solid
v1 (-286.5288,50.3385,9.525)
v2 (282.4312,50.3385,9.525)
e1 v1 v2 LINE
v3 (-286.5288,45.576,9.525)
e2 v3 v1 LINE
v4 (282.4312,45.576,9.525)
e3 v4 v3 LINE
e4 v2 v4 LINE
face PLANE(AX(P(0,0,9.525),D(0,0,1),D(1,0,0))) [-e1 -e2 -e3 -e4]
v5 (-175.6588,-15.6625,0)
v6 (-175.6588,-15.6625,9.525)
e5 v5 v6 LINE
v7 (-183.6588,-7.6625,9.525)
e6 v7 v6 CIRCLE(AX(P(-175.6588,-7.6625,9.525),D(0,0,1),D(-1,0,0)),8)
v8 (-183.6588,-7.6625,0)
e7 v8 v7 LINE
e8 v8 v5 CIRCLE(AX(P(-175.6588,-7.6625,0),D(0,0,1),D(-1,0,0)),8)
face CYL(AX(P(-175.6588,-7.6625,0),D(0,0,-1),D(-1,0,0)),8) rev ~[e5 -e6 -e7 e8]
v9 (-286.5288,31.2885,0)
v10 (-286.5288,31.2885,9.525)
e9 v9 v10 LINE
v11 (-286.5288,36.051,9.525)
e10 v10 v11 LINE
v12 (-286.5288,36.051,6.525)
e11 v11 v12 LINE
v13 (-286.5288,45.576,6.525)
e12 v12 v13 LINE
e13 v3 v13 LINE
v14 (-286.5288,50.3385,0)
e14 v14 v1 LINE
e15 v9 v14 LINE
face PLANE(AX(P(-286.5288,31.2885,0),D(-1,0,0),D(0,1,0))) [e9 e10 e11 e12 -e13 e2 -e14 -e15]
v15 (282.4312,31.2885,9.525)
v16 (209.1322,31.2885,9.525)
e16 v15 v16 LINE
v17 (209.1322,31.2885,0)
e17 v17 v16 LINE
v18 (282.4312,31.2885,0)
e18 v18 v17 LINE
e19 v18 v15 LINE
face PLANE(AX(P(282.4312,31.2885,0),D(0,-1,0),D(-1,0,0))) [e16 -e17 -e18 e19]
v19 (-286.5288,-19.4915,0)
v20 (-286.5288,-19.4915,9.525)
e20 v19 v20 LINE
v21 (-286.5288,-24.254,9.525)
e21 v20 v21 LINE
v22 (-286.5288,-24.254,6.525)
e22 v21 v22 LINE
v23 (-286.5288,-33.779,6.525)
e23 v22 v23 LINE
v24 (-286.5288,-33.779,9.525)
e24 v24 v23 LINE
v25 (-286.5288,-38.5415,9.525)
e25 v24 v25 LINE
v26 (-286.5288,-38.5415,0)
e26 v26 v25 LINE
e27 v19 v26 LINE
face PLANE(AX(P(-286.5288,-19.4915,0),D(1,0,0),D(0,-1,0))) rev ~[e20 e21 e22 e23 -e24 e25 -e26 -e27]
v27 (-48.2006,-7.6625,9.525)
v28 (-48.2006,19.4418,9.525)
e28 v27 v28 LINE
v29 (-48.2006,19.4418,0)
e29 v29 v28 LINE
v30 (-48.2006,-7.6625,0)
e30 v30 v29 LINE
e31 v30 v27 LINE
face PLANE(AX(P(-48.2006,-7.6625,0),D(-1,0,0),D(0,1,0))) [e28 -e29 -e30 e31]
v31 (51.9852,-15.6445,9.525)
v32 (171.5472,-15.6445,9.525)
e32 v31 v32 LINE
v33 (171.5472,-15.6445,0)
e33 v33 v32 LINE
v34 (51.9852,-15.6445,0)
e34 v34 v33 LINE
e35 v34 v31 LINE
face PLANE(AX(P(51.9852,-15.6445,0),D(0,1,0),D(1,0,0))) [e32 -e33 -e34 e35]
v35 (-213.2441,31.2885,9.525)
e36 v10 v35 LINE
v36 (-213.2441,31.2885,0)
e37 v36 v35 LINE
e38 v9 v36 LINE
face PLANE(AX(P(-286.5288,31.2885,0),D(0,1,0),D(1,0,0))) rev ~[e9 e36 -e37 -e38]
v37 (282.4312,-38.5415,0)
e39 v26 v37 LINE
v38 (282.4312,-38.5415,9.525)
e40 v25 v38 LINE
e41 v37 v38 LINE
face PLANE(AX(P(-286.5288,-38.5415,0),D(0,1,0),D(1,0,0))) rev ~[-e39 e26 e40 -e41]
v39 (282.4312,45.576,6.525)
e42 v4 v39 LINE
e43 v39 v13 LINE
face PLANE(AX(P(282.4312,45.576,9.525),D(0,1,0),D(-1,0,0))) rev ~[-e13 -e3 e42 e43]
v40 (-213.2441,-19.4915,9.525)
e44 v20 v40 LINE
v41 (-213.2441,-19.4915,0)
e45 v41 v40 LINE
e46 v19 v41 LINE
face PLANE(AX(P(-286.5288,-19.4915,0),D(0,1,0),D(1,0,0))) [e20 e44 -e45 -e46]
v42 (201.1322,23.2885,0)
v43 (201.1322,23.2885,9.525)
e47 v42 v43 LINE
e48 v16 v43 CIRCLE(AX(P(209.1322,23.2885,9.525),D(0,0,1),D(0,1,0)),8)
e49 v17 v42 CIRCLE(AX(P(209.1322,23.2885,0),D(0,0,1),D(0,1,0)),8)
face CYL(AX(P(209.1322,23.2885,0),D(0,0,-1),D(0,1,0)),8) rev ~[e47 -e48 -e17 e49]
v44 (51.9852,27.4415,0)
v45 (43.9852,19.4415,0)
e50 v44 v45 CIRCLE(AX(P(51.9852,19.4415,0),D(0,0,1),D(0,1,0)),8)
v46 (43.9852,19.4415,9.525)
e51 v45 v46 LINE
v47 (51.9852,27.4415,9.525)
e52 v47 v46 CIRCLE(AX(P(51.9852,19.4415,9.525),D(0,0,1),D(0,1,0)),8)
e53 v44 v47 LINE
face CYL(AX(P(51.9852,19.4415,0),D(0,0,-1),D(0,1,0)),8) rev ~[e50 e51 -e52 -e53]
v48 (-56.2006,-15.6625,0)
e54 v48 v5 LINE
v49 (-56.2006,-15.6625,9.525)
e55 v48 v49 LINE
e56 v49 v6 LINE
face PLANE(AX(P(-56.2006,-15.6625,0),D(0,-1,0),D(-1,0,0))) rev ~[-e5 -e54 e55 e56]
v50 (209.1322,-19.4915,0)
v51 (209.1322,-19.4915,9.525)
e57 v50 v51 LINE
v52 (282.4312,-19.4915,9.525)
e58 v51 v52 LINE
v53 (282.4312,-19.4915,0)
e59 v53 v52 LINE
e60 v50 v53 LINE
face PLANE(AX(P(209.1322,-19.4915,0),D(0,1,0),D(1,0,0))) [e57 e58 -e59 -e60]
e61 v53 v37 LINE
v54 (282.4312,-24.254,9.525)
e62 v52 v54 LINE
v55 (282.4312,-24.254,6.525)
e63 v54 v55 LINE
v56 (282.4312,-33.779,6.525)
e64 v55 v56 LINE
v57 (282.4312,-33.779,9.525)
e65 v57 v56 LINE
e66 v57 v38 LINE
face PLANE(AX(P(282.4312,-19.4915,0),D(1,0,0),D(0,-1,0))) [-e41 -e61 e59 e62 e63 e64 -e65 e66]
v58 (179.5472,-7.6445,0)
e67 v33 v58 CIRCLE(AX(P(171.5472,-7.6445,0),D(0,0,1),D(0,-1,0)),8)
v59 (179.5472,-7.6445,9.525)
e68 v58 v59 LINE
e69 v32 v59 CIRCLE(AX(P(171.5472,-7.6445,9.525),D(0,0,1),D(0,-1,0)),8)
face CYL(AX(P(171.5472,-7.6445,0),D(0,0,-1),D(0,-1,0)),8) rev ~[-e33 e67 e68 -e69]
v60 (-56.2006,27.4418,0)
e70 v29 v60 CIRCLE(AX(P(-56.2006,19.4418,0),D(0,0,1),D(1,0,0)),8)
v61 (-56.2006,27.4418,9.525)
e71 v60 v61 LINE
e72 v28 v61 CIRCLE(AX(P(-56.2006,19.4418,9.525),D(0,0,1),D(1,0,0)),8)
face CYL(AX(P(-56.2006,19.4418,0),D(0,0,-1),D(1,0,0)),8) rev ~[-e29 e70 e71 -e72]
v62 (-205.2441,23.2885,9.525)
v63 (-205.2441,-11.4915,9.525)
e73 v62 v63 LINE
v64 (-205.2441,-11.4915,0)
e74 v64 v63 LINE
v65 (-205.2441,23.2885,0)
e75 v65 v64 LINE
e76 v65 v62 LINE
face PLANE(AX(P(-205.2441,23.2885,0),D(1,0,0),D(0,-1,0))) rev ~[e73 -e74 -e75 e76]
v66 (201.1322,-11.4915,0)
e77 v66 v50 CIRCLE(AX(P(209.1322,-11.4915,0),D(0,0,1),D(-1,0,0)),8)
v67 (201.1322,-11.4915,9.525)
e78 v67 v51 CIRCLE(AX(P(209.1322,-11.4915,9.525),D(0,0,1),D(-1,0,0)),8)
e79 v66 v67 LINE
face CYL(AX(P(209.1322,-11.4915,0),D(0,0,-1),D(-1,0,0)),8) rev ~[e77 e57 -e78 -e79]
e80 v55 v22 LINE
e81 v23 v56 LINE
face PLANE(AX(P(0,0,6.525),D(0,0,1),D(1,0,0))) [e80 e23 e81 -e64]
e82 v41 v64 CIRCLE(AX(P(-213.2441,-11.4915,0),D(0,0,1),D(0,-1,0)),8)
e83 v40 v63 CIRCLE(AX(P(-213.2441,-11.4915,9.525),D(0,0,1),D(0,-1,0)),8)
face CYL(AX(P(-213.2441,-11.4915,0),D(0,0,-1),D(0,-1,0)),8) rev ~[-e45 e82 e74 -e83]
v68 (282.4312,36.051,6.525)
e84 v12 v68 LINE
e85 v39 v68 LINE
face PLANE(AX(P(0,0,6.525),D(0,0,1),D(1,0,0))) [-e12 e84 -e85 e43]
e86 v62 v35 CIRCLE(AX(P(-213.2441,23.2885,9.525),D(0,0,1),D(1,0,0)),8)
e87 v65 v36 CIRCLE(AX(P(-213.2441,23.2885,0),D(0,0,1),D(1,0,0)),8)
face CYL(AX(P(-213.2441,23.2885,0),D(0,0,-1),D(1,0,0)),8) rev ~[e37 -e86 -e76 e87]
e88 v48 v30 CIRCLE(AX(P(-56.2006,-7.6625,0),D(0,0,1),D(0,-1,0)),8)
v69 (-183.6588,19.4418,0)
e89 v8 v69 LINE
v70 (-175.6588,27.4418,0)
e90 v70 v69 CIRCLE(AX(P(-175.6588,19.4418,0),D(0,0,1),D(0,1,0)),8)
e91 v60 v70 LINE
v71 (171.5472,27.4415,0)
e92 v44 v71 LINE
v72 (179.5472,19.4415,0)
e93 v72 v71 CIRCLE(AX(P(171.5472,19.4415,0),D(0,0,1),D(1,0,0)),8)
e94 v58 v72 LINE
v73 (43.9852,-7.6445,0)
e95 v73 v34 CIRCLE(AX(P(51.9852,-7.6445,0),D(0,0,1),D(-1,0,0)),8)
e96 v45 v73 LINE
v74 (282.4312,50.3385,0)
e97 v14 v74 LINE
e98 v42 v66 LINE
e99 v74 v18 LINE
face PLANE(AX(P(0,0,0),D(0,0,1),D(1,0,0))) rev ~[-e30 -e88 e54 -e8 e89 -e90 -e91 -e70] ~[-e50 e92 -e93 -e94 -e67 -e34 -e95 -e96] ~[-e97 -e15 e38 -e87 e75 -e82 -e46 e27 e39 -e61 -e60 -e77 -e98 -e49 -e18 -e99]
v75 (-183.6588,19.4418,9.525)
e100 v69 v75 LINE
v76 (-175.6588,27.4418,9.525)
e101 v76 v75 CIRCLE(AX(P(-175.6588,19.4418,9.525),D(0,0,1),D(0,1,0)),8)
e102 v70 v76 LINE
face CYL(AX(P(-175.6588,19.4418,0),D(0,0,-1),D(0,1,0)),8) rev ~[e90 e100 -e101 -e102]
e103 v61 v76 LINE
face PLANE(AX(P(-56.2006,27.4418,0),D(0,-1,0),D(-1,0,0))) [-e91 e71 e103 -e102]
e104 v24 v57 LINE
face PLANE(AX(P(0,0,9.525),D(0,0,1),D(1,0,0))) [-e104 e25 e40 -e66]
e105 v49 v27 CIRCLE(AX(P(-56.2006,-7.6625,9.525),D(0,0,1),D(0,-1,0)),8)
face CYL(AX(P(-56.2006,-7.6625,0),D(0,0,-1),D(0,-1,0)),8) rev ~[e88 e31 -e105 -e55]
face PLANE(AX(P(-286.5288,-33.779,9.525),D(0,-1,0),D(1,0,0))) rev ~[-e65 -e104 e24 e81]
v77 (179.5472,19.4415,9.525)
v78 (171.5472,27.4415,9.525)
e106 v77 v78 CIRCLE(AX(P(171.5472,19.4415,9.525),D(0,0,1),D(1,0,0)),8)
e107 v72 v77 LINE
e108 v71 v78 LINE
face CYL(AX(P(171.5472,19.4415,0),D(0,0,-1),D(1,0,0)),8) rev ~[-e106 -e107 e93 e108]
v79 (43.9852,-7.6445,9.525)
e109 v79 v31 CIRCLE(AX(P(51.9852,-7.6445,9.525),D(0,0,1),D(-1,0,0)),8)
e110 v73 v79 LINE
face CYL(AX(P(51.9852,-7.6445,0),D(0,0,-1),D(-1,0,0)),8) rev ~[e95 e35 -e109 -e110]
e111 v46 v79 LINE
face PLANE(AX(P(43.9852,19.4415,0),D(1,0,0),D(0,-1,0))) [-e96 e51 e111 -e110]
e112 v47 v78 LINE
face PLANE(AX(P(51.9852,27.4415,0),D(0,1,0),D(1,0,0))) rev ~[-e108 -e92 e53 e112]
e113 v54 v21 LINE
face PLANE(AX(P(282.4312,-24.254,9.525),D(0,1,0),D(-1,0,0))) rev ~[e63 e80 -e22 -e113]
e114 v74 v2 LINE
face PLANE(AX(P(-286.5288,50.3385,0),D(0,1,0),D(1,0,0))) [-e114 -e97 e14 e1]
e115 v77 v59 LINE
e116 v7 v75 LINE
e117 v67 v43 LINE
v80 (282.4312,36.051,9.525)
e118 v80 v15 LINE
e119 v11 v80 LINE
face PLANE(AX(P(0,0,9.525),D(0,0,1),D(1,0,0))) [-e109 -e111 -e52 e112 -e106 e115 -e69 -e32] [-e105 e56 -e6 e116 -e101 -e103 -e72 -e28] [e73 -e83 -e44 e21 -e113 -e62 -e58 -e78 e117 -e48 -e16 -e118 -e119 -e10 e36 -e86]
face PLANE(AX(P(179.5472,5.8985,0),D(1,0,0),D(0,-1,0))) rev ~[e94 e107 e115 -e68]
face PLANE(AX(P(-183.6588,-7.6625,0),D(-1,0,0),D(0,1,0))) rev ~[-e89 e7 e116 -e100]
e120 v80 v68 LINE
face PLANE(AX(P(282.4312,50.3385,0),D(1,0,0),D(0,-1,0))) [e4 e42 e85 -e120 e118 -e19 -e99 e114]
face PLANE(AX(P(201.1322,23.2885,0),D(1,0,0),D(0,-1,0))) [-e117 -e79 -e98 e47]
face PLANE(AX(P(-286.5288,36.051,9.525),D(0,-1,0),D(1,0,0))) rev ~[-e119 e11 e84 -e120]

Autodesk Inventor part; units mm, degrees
ref_plane "YZ Plane" through (0, 0, 0) normal (1, 0, 0) x (0, 1, 0)
ref_plane "XZ Plane" through (0, 0, 0) normal (0, 1, 0) x (-1, 0, 0)
ref_plane "XY Plane" through (0, 0, 0) normal (0, 0, 1) x (1, 0, 0)
sketch "Sketch1" plane through (0, 0, 0) normal (0, 0, 1) x (1, 0, 0)
  line L0 (-56.2006, 27.4418) -> (-175.6588, 27.4418)
  line L1 (-56.2006, -15.6625) -> (-175.6588, -15.6625)
  line L2 (-48.2006, -7.6625) -> (-48.2006, 19.4418)
  line L3 (-183.6588, -7.6625) -> (-183.6588, 19.4418)
  line L4 (-286.5288, -19.4915) -> (-213.2441, -19.4915)
  line L5 (-286.5288, 31.2885) -> (-213.2441, 31.2885)
  line L6 (-205.2441, 23.2885) -> (-205.2441, -11.4915)
  line L7 (51.9852, 27.4415) -> (171.5472, 27.4415)
  line L8 (51.9852, -15.6445) -> (171.5472, -15.6445)
  line L9 (43.9852, 19.4415) -> (43.9852, -7.6445)
  line L10 (179.5472, 19.4415) -> (179.5472, -7.6445)
  arc A0 (-205.2441, 23.2885) -> (-213.2441, 31.2885) centre (-213.2441, 23.2885) ccw
  arc A1 (-175.6588, 27.4418) -> (-183.6588, 19.4418) centre (-175.6588, 19.4418) ccw
  arc A2 (-183.6588, -7.6625) -> (-175.6588, -15.6625) centre (-175.6588, -7.6625) ccw
  arc A3 (-56.2006, -15.6625) -> (-48.2006, -7.6625) centre (-56.2006, -7.6625) ccw
  arc A4 (-48.2006, 19.4418) -> (-56.2006, 27.4418) centre (-56.2006, 19.4418) ccw
  arc A5 (-213.2441, -19.4915) -> (-205.2441, -11.4915) centre (-213.2441, -11.4915) ccw
  arc A6 (51.9852, 27.4415) -> (43.9852, 19.4415) centre (51.9852, 19.4415) ccw
  arc A7 (43.9852, -7.6445) -> (51.9852, -15.6445) centre (51.9852, -7.6445) ccw
  arc A8 (171.5472, -15.6445) -> (179.5472, -7.6445) centre (171.5472, -7.6445) ccw
  arc A9 (179.5472, 19.4415) -> (171.5472, 27.4415) centre (171.5472, 19.4415) ccw
  line L11 (-286.5288, 50.3385) -> (282.4312, 50.3385)
  line L12 (-286.5288, -38.5415) -> (282.4312, -38.5415)
  line L13 (-286.5288, 31.2885) -> (-286.5288, 50.3385)
  line L14 (-286.5288, -19.4915) -> (-286.5288, -38.5415)
  line L15 (179.5472, 5.8985) -> (201.1322, 5.9085)
  line L16 (282.4312, 31.2885) -> (209.1322, 31.2885)
  line L17 (201.1322, 23.2885) -> (201.1322, -11.4915)
  line L18 (209.1322, -19.4915) -> (282.4312, -19.4915)
  arc A10 (201.1322, -11.4915) -> (209.1322, -19.4915) centre (209.1322, -11.4915) ccw
  arc A11 (209.1322, 31.2885) -> (201.1322, 23.2885) centre (209.1322, 23.2885) ccw
  line L19 (282.4312, 50.3385) -> (282.4312, 31.2885)
  line L20 (282.4312, -19.4915) -> (282.4312, -38.5415)
  point P0 (0, 0)
  point P1 (0, 0)
  point P2 (-209.4751, 31.2885)
  point P3 (-205.2441, 26.6389)
  point P4 (-209.4751, -19.4915)
  point P5 (-179.9924, 27.4418)
  point P6 (-183.6588, 23.2495)
  point P7 (-183.6588, -11.4325)
  point P8 (-179.4288, -15.6625)
  point P9 (-48.2006, 23.2495)
  point P10 (-52.4306, 27.4418)
  point P11 (-52.9924, -15.6625)
  point P12 (-48.2006, -11.4325)
  point P13 (-205.2441, -15.2625)
  point P14 (48.2152, 27.4415)
  point P15 (43.9852, 23.2115)
  point P16 (48.2152, -15.6445)
  point P17 (179.5472, 23.2115)
  point P18 (175.3172, 27.4415)
  point P19 (175.3172, -15.6445)
  point P20 (179.5472, -11.4145)
  point P21 (43.9852, -11.4145)
  dimension "d0" = 135.4582
  dimension "d1" = 43.1043
  dimension "d4" = 21.5853
  dimension "d5" = 92.1858
  dimension "d8" = 8
  dimension "d9" = 8
  dimension "d10" = 8
  dimension "d50" = 50.7799
  dimension "d62" = 88.8799
  dimension "d63" = 19.05
  dimension "d64" = 50.7799
ref_plane "Work Plane7" through (0, 0, 9.525) normal (0, 0, 1) x (1, 0, 0)
extrude "Extrusion6" add sketch "Sketch1" along normal blind 9.525
sketch "Sketch7" plane through (0, 0, 9.525) normal (0, 0, 1) x (1, 0, 0)
  line L0 (-286.5288, 50.3385) -> (-286.5288, 31.2885) projected
  line L1 (282.4312, 31.2885) -> (282.4312, 50.3385) projected
  line L2 (-286.5288, 45.576) -> (282.4312, 45.576)
  line L3 (282.4312, 45.576) -> (282.4312, 36.051)
  line L4 (282.4312, 36.051) -> (-286.5288, 36.051)
  line L5 (-286.5288, 36.051) -> (-286.5288, 45.576)
  line L6 (282.4312, 50.3385) -> (-286.5288, 50.3385) projected
  line L7 (282.4312, -38.5415) -> (282.4312, -19.4915) projected
  line L8 (-286.5288, -24.254) -> (282.4312, -24.254)
  line L9 (282.4312, -24.254) -> (282.4312, -33.779)
  line L10 (282.4312, -33.779) -> (-286.5288, -33.779)
  line L11 (-286.5288, -33.779) -> (-286.5288, -24.254)
  line L12 (-286.5288, -38.5415) -> (282.4312, -38.5415) projected
  point P0 (0, 0)
  dimension "d98" = 9.525
  dimension "d99" = 4.7625
  dimension "d100" = 4.7625
  dimension "d101" = 9.525
emboss "Emboss7" sketch "Sketch7" operation cut depth 3 direction (0, 0, -1) contours L2 L1 L4 L0 | L10 L11 L8 L7
properties part number "top" material "Aluminum 6061"
